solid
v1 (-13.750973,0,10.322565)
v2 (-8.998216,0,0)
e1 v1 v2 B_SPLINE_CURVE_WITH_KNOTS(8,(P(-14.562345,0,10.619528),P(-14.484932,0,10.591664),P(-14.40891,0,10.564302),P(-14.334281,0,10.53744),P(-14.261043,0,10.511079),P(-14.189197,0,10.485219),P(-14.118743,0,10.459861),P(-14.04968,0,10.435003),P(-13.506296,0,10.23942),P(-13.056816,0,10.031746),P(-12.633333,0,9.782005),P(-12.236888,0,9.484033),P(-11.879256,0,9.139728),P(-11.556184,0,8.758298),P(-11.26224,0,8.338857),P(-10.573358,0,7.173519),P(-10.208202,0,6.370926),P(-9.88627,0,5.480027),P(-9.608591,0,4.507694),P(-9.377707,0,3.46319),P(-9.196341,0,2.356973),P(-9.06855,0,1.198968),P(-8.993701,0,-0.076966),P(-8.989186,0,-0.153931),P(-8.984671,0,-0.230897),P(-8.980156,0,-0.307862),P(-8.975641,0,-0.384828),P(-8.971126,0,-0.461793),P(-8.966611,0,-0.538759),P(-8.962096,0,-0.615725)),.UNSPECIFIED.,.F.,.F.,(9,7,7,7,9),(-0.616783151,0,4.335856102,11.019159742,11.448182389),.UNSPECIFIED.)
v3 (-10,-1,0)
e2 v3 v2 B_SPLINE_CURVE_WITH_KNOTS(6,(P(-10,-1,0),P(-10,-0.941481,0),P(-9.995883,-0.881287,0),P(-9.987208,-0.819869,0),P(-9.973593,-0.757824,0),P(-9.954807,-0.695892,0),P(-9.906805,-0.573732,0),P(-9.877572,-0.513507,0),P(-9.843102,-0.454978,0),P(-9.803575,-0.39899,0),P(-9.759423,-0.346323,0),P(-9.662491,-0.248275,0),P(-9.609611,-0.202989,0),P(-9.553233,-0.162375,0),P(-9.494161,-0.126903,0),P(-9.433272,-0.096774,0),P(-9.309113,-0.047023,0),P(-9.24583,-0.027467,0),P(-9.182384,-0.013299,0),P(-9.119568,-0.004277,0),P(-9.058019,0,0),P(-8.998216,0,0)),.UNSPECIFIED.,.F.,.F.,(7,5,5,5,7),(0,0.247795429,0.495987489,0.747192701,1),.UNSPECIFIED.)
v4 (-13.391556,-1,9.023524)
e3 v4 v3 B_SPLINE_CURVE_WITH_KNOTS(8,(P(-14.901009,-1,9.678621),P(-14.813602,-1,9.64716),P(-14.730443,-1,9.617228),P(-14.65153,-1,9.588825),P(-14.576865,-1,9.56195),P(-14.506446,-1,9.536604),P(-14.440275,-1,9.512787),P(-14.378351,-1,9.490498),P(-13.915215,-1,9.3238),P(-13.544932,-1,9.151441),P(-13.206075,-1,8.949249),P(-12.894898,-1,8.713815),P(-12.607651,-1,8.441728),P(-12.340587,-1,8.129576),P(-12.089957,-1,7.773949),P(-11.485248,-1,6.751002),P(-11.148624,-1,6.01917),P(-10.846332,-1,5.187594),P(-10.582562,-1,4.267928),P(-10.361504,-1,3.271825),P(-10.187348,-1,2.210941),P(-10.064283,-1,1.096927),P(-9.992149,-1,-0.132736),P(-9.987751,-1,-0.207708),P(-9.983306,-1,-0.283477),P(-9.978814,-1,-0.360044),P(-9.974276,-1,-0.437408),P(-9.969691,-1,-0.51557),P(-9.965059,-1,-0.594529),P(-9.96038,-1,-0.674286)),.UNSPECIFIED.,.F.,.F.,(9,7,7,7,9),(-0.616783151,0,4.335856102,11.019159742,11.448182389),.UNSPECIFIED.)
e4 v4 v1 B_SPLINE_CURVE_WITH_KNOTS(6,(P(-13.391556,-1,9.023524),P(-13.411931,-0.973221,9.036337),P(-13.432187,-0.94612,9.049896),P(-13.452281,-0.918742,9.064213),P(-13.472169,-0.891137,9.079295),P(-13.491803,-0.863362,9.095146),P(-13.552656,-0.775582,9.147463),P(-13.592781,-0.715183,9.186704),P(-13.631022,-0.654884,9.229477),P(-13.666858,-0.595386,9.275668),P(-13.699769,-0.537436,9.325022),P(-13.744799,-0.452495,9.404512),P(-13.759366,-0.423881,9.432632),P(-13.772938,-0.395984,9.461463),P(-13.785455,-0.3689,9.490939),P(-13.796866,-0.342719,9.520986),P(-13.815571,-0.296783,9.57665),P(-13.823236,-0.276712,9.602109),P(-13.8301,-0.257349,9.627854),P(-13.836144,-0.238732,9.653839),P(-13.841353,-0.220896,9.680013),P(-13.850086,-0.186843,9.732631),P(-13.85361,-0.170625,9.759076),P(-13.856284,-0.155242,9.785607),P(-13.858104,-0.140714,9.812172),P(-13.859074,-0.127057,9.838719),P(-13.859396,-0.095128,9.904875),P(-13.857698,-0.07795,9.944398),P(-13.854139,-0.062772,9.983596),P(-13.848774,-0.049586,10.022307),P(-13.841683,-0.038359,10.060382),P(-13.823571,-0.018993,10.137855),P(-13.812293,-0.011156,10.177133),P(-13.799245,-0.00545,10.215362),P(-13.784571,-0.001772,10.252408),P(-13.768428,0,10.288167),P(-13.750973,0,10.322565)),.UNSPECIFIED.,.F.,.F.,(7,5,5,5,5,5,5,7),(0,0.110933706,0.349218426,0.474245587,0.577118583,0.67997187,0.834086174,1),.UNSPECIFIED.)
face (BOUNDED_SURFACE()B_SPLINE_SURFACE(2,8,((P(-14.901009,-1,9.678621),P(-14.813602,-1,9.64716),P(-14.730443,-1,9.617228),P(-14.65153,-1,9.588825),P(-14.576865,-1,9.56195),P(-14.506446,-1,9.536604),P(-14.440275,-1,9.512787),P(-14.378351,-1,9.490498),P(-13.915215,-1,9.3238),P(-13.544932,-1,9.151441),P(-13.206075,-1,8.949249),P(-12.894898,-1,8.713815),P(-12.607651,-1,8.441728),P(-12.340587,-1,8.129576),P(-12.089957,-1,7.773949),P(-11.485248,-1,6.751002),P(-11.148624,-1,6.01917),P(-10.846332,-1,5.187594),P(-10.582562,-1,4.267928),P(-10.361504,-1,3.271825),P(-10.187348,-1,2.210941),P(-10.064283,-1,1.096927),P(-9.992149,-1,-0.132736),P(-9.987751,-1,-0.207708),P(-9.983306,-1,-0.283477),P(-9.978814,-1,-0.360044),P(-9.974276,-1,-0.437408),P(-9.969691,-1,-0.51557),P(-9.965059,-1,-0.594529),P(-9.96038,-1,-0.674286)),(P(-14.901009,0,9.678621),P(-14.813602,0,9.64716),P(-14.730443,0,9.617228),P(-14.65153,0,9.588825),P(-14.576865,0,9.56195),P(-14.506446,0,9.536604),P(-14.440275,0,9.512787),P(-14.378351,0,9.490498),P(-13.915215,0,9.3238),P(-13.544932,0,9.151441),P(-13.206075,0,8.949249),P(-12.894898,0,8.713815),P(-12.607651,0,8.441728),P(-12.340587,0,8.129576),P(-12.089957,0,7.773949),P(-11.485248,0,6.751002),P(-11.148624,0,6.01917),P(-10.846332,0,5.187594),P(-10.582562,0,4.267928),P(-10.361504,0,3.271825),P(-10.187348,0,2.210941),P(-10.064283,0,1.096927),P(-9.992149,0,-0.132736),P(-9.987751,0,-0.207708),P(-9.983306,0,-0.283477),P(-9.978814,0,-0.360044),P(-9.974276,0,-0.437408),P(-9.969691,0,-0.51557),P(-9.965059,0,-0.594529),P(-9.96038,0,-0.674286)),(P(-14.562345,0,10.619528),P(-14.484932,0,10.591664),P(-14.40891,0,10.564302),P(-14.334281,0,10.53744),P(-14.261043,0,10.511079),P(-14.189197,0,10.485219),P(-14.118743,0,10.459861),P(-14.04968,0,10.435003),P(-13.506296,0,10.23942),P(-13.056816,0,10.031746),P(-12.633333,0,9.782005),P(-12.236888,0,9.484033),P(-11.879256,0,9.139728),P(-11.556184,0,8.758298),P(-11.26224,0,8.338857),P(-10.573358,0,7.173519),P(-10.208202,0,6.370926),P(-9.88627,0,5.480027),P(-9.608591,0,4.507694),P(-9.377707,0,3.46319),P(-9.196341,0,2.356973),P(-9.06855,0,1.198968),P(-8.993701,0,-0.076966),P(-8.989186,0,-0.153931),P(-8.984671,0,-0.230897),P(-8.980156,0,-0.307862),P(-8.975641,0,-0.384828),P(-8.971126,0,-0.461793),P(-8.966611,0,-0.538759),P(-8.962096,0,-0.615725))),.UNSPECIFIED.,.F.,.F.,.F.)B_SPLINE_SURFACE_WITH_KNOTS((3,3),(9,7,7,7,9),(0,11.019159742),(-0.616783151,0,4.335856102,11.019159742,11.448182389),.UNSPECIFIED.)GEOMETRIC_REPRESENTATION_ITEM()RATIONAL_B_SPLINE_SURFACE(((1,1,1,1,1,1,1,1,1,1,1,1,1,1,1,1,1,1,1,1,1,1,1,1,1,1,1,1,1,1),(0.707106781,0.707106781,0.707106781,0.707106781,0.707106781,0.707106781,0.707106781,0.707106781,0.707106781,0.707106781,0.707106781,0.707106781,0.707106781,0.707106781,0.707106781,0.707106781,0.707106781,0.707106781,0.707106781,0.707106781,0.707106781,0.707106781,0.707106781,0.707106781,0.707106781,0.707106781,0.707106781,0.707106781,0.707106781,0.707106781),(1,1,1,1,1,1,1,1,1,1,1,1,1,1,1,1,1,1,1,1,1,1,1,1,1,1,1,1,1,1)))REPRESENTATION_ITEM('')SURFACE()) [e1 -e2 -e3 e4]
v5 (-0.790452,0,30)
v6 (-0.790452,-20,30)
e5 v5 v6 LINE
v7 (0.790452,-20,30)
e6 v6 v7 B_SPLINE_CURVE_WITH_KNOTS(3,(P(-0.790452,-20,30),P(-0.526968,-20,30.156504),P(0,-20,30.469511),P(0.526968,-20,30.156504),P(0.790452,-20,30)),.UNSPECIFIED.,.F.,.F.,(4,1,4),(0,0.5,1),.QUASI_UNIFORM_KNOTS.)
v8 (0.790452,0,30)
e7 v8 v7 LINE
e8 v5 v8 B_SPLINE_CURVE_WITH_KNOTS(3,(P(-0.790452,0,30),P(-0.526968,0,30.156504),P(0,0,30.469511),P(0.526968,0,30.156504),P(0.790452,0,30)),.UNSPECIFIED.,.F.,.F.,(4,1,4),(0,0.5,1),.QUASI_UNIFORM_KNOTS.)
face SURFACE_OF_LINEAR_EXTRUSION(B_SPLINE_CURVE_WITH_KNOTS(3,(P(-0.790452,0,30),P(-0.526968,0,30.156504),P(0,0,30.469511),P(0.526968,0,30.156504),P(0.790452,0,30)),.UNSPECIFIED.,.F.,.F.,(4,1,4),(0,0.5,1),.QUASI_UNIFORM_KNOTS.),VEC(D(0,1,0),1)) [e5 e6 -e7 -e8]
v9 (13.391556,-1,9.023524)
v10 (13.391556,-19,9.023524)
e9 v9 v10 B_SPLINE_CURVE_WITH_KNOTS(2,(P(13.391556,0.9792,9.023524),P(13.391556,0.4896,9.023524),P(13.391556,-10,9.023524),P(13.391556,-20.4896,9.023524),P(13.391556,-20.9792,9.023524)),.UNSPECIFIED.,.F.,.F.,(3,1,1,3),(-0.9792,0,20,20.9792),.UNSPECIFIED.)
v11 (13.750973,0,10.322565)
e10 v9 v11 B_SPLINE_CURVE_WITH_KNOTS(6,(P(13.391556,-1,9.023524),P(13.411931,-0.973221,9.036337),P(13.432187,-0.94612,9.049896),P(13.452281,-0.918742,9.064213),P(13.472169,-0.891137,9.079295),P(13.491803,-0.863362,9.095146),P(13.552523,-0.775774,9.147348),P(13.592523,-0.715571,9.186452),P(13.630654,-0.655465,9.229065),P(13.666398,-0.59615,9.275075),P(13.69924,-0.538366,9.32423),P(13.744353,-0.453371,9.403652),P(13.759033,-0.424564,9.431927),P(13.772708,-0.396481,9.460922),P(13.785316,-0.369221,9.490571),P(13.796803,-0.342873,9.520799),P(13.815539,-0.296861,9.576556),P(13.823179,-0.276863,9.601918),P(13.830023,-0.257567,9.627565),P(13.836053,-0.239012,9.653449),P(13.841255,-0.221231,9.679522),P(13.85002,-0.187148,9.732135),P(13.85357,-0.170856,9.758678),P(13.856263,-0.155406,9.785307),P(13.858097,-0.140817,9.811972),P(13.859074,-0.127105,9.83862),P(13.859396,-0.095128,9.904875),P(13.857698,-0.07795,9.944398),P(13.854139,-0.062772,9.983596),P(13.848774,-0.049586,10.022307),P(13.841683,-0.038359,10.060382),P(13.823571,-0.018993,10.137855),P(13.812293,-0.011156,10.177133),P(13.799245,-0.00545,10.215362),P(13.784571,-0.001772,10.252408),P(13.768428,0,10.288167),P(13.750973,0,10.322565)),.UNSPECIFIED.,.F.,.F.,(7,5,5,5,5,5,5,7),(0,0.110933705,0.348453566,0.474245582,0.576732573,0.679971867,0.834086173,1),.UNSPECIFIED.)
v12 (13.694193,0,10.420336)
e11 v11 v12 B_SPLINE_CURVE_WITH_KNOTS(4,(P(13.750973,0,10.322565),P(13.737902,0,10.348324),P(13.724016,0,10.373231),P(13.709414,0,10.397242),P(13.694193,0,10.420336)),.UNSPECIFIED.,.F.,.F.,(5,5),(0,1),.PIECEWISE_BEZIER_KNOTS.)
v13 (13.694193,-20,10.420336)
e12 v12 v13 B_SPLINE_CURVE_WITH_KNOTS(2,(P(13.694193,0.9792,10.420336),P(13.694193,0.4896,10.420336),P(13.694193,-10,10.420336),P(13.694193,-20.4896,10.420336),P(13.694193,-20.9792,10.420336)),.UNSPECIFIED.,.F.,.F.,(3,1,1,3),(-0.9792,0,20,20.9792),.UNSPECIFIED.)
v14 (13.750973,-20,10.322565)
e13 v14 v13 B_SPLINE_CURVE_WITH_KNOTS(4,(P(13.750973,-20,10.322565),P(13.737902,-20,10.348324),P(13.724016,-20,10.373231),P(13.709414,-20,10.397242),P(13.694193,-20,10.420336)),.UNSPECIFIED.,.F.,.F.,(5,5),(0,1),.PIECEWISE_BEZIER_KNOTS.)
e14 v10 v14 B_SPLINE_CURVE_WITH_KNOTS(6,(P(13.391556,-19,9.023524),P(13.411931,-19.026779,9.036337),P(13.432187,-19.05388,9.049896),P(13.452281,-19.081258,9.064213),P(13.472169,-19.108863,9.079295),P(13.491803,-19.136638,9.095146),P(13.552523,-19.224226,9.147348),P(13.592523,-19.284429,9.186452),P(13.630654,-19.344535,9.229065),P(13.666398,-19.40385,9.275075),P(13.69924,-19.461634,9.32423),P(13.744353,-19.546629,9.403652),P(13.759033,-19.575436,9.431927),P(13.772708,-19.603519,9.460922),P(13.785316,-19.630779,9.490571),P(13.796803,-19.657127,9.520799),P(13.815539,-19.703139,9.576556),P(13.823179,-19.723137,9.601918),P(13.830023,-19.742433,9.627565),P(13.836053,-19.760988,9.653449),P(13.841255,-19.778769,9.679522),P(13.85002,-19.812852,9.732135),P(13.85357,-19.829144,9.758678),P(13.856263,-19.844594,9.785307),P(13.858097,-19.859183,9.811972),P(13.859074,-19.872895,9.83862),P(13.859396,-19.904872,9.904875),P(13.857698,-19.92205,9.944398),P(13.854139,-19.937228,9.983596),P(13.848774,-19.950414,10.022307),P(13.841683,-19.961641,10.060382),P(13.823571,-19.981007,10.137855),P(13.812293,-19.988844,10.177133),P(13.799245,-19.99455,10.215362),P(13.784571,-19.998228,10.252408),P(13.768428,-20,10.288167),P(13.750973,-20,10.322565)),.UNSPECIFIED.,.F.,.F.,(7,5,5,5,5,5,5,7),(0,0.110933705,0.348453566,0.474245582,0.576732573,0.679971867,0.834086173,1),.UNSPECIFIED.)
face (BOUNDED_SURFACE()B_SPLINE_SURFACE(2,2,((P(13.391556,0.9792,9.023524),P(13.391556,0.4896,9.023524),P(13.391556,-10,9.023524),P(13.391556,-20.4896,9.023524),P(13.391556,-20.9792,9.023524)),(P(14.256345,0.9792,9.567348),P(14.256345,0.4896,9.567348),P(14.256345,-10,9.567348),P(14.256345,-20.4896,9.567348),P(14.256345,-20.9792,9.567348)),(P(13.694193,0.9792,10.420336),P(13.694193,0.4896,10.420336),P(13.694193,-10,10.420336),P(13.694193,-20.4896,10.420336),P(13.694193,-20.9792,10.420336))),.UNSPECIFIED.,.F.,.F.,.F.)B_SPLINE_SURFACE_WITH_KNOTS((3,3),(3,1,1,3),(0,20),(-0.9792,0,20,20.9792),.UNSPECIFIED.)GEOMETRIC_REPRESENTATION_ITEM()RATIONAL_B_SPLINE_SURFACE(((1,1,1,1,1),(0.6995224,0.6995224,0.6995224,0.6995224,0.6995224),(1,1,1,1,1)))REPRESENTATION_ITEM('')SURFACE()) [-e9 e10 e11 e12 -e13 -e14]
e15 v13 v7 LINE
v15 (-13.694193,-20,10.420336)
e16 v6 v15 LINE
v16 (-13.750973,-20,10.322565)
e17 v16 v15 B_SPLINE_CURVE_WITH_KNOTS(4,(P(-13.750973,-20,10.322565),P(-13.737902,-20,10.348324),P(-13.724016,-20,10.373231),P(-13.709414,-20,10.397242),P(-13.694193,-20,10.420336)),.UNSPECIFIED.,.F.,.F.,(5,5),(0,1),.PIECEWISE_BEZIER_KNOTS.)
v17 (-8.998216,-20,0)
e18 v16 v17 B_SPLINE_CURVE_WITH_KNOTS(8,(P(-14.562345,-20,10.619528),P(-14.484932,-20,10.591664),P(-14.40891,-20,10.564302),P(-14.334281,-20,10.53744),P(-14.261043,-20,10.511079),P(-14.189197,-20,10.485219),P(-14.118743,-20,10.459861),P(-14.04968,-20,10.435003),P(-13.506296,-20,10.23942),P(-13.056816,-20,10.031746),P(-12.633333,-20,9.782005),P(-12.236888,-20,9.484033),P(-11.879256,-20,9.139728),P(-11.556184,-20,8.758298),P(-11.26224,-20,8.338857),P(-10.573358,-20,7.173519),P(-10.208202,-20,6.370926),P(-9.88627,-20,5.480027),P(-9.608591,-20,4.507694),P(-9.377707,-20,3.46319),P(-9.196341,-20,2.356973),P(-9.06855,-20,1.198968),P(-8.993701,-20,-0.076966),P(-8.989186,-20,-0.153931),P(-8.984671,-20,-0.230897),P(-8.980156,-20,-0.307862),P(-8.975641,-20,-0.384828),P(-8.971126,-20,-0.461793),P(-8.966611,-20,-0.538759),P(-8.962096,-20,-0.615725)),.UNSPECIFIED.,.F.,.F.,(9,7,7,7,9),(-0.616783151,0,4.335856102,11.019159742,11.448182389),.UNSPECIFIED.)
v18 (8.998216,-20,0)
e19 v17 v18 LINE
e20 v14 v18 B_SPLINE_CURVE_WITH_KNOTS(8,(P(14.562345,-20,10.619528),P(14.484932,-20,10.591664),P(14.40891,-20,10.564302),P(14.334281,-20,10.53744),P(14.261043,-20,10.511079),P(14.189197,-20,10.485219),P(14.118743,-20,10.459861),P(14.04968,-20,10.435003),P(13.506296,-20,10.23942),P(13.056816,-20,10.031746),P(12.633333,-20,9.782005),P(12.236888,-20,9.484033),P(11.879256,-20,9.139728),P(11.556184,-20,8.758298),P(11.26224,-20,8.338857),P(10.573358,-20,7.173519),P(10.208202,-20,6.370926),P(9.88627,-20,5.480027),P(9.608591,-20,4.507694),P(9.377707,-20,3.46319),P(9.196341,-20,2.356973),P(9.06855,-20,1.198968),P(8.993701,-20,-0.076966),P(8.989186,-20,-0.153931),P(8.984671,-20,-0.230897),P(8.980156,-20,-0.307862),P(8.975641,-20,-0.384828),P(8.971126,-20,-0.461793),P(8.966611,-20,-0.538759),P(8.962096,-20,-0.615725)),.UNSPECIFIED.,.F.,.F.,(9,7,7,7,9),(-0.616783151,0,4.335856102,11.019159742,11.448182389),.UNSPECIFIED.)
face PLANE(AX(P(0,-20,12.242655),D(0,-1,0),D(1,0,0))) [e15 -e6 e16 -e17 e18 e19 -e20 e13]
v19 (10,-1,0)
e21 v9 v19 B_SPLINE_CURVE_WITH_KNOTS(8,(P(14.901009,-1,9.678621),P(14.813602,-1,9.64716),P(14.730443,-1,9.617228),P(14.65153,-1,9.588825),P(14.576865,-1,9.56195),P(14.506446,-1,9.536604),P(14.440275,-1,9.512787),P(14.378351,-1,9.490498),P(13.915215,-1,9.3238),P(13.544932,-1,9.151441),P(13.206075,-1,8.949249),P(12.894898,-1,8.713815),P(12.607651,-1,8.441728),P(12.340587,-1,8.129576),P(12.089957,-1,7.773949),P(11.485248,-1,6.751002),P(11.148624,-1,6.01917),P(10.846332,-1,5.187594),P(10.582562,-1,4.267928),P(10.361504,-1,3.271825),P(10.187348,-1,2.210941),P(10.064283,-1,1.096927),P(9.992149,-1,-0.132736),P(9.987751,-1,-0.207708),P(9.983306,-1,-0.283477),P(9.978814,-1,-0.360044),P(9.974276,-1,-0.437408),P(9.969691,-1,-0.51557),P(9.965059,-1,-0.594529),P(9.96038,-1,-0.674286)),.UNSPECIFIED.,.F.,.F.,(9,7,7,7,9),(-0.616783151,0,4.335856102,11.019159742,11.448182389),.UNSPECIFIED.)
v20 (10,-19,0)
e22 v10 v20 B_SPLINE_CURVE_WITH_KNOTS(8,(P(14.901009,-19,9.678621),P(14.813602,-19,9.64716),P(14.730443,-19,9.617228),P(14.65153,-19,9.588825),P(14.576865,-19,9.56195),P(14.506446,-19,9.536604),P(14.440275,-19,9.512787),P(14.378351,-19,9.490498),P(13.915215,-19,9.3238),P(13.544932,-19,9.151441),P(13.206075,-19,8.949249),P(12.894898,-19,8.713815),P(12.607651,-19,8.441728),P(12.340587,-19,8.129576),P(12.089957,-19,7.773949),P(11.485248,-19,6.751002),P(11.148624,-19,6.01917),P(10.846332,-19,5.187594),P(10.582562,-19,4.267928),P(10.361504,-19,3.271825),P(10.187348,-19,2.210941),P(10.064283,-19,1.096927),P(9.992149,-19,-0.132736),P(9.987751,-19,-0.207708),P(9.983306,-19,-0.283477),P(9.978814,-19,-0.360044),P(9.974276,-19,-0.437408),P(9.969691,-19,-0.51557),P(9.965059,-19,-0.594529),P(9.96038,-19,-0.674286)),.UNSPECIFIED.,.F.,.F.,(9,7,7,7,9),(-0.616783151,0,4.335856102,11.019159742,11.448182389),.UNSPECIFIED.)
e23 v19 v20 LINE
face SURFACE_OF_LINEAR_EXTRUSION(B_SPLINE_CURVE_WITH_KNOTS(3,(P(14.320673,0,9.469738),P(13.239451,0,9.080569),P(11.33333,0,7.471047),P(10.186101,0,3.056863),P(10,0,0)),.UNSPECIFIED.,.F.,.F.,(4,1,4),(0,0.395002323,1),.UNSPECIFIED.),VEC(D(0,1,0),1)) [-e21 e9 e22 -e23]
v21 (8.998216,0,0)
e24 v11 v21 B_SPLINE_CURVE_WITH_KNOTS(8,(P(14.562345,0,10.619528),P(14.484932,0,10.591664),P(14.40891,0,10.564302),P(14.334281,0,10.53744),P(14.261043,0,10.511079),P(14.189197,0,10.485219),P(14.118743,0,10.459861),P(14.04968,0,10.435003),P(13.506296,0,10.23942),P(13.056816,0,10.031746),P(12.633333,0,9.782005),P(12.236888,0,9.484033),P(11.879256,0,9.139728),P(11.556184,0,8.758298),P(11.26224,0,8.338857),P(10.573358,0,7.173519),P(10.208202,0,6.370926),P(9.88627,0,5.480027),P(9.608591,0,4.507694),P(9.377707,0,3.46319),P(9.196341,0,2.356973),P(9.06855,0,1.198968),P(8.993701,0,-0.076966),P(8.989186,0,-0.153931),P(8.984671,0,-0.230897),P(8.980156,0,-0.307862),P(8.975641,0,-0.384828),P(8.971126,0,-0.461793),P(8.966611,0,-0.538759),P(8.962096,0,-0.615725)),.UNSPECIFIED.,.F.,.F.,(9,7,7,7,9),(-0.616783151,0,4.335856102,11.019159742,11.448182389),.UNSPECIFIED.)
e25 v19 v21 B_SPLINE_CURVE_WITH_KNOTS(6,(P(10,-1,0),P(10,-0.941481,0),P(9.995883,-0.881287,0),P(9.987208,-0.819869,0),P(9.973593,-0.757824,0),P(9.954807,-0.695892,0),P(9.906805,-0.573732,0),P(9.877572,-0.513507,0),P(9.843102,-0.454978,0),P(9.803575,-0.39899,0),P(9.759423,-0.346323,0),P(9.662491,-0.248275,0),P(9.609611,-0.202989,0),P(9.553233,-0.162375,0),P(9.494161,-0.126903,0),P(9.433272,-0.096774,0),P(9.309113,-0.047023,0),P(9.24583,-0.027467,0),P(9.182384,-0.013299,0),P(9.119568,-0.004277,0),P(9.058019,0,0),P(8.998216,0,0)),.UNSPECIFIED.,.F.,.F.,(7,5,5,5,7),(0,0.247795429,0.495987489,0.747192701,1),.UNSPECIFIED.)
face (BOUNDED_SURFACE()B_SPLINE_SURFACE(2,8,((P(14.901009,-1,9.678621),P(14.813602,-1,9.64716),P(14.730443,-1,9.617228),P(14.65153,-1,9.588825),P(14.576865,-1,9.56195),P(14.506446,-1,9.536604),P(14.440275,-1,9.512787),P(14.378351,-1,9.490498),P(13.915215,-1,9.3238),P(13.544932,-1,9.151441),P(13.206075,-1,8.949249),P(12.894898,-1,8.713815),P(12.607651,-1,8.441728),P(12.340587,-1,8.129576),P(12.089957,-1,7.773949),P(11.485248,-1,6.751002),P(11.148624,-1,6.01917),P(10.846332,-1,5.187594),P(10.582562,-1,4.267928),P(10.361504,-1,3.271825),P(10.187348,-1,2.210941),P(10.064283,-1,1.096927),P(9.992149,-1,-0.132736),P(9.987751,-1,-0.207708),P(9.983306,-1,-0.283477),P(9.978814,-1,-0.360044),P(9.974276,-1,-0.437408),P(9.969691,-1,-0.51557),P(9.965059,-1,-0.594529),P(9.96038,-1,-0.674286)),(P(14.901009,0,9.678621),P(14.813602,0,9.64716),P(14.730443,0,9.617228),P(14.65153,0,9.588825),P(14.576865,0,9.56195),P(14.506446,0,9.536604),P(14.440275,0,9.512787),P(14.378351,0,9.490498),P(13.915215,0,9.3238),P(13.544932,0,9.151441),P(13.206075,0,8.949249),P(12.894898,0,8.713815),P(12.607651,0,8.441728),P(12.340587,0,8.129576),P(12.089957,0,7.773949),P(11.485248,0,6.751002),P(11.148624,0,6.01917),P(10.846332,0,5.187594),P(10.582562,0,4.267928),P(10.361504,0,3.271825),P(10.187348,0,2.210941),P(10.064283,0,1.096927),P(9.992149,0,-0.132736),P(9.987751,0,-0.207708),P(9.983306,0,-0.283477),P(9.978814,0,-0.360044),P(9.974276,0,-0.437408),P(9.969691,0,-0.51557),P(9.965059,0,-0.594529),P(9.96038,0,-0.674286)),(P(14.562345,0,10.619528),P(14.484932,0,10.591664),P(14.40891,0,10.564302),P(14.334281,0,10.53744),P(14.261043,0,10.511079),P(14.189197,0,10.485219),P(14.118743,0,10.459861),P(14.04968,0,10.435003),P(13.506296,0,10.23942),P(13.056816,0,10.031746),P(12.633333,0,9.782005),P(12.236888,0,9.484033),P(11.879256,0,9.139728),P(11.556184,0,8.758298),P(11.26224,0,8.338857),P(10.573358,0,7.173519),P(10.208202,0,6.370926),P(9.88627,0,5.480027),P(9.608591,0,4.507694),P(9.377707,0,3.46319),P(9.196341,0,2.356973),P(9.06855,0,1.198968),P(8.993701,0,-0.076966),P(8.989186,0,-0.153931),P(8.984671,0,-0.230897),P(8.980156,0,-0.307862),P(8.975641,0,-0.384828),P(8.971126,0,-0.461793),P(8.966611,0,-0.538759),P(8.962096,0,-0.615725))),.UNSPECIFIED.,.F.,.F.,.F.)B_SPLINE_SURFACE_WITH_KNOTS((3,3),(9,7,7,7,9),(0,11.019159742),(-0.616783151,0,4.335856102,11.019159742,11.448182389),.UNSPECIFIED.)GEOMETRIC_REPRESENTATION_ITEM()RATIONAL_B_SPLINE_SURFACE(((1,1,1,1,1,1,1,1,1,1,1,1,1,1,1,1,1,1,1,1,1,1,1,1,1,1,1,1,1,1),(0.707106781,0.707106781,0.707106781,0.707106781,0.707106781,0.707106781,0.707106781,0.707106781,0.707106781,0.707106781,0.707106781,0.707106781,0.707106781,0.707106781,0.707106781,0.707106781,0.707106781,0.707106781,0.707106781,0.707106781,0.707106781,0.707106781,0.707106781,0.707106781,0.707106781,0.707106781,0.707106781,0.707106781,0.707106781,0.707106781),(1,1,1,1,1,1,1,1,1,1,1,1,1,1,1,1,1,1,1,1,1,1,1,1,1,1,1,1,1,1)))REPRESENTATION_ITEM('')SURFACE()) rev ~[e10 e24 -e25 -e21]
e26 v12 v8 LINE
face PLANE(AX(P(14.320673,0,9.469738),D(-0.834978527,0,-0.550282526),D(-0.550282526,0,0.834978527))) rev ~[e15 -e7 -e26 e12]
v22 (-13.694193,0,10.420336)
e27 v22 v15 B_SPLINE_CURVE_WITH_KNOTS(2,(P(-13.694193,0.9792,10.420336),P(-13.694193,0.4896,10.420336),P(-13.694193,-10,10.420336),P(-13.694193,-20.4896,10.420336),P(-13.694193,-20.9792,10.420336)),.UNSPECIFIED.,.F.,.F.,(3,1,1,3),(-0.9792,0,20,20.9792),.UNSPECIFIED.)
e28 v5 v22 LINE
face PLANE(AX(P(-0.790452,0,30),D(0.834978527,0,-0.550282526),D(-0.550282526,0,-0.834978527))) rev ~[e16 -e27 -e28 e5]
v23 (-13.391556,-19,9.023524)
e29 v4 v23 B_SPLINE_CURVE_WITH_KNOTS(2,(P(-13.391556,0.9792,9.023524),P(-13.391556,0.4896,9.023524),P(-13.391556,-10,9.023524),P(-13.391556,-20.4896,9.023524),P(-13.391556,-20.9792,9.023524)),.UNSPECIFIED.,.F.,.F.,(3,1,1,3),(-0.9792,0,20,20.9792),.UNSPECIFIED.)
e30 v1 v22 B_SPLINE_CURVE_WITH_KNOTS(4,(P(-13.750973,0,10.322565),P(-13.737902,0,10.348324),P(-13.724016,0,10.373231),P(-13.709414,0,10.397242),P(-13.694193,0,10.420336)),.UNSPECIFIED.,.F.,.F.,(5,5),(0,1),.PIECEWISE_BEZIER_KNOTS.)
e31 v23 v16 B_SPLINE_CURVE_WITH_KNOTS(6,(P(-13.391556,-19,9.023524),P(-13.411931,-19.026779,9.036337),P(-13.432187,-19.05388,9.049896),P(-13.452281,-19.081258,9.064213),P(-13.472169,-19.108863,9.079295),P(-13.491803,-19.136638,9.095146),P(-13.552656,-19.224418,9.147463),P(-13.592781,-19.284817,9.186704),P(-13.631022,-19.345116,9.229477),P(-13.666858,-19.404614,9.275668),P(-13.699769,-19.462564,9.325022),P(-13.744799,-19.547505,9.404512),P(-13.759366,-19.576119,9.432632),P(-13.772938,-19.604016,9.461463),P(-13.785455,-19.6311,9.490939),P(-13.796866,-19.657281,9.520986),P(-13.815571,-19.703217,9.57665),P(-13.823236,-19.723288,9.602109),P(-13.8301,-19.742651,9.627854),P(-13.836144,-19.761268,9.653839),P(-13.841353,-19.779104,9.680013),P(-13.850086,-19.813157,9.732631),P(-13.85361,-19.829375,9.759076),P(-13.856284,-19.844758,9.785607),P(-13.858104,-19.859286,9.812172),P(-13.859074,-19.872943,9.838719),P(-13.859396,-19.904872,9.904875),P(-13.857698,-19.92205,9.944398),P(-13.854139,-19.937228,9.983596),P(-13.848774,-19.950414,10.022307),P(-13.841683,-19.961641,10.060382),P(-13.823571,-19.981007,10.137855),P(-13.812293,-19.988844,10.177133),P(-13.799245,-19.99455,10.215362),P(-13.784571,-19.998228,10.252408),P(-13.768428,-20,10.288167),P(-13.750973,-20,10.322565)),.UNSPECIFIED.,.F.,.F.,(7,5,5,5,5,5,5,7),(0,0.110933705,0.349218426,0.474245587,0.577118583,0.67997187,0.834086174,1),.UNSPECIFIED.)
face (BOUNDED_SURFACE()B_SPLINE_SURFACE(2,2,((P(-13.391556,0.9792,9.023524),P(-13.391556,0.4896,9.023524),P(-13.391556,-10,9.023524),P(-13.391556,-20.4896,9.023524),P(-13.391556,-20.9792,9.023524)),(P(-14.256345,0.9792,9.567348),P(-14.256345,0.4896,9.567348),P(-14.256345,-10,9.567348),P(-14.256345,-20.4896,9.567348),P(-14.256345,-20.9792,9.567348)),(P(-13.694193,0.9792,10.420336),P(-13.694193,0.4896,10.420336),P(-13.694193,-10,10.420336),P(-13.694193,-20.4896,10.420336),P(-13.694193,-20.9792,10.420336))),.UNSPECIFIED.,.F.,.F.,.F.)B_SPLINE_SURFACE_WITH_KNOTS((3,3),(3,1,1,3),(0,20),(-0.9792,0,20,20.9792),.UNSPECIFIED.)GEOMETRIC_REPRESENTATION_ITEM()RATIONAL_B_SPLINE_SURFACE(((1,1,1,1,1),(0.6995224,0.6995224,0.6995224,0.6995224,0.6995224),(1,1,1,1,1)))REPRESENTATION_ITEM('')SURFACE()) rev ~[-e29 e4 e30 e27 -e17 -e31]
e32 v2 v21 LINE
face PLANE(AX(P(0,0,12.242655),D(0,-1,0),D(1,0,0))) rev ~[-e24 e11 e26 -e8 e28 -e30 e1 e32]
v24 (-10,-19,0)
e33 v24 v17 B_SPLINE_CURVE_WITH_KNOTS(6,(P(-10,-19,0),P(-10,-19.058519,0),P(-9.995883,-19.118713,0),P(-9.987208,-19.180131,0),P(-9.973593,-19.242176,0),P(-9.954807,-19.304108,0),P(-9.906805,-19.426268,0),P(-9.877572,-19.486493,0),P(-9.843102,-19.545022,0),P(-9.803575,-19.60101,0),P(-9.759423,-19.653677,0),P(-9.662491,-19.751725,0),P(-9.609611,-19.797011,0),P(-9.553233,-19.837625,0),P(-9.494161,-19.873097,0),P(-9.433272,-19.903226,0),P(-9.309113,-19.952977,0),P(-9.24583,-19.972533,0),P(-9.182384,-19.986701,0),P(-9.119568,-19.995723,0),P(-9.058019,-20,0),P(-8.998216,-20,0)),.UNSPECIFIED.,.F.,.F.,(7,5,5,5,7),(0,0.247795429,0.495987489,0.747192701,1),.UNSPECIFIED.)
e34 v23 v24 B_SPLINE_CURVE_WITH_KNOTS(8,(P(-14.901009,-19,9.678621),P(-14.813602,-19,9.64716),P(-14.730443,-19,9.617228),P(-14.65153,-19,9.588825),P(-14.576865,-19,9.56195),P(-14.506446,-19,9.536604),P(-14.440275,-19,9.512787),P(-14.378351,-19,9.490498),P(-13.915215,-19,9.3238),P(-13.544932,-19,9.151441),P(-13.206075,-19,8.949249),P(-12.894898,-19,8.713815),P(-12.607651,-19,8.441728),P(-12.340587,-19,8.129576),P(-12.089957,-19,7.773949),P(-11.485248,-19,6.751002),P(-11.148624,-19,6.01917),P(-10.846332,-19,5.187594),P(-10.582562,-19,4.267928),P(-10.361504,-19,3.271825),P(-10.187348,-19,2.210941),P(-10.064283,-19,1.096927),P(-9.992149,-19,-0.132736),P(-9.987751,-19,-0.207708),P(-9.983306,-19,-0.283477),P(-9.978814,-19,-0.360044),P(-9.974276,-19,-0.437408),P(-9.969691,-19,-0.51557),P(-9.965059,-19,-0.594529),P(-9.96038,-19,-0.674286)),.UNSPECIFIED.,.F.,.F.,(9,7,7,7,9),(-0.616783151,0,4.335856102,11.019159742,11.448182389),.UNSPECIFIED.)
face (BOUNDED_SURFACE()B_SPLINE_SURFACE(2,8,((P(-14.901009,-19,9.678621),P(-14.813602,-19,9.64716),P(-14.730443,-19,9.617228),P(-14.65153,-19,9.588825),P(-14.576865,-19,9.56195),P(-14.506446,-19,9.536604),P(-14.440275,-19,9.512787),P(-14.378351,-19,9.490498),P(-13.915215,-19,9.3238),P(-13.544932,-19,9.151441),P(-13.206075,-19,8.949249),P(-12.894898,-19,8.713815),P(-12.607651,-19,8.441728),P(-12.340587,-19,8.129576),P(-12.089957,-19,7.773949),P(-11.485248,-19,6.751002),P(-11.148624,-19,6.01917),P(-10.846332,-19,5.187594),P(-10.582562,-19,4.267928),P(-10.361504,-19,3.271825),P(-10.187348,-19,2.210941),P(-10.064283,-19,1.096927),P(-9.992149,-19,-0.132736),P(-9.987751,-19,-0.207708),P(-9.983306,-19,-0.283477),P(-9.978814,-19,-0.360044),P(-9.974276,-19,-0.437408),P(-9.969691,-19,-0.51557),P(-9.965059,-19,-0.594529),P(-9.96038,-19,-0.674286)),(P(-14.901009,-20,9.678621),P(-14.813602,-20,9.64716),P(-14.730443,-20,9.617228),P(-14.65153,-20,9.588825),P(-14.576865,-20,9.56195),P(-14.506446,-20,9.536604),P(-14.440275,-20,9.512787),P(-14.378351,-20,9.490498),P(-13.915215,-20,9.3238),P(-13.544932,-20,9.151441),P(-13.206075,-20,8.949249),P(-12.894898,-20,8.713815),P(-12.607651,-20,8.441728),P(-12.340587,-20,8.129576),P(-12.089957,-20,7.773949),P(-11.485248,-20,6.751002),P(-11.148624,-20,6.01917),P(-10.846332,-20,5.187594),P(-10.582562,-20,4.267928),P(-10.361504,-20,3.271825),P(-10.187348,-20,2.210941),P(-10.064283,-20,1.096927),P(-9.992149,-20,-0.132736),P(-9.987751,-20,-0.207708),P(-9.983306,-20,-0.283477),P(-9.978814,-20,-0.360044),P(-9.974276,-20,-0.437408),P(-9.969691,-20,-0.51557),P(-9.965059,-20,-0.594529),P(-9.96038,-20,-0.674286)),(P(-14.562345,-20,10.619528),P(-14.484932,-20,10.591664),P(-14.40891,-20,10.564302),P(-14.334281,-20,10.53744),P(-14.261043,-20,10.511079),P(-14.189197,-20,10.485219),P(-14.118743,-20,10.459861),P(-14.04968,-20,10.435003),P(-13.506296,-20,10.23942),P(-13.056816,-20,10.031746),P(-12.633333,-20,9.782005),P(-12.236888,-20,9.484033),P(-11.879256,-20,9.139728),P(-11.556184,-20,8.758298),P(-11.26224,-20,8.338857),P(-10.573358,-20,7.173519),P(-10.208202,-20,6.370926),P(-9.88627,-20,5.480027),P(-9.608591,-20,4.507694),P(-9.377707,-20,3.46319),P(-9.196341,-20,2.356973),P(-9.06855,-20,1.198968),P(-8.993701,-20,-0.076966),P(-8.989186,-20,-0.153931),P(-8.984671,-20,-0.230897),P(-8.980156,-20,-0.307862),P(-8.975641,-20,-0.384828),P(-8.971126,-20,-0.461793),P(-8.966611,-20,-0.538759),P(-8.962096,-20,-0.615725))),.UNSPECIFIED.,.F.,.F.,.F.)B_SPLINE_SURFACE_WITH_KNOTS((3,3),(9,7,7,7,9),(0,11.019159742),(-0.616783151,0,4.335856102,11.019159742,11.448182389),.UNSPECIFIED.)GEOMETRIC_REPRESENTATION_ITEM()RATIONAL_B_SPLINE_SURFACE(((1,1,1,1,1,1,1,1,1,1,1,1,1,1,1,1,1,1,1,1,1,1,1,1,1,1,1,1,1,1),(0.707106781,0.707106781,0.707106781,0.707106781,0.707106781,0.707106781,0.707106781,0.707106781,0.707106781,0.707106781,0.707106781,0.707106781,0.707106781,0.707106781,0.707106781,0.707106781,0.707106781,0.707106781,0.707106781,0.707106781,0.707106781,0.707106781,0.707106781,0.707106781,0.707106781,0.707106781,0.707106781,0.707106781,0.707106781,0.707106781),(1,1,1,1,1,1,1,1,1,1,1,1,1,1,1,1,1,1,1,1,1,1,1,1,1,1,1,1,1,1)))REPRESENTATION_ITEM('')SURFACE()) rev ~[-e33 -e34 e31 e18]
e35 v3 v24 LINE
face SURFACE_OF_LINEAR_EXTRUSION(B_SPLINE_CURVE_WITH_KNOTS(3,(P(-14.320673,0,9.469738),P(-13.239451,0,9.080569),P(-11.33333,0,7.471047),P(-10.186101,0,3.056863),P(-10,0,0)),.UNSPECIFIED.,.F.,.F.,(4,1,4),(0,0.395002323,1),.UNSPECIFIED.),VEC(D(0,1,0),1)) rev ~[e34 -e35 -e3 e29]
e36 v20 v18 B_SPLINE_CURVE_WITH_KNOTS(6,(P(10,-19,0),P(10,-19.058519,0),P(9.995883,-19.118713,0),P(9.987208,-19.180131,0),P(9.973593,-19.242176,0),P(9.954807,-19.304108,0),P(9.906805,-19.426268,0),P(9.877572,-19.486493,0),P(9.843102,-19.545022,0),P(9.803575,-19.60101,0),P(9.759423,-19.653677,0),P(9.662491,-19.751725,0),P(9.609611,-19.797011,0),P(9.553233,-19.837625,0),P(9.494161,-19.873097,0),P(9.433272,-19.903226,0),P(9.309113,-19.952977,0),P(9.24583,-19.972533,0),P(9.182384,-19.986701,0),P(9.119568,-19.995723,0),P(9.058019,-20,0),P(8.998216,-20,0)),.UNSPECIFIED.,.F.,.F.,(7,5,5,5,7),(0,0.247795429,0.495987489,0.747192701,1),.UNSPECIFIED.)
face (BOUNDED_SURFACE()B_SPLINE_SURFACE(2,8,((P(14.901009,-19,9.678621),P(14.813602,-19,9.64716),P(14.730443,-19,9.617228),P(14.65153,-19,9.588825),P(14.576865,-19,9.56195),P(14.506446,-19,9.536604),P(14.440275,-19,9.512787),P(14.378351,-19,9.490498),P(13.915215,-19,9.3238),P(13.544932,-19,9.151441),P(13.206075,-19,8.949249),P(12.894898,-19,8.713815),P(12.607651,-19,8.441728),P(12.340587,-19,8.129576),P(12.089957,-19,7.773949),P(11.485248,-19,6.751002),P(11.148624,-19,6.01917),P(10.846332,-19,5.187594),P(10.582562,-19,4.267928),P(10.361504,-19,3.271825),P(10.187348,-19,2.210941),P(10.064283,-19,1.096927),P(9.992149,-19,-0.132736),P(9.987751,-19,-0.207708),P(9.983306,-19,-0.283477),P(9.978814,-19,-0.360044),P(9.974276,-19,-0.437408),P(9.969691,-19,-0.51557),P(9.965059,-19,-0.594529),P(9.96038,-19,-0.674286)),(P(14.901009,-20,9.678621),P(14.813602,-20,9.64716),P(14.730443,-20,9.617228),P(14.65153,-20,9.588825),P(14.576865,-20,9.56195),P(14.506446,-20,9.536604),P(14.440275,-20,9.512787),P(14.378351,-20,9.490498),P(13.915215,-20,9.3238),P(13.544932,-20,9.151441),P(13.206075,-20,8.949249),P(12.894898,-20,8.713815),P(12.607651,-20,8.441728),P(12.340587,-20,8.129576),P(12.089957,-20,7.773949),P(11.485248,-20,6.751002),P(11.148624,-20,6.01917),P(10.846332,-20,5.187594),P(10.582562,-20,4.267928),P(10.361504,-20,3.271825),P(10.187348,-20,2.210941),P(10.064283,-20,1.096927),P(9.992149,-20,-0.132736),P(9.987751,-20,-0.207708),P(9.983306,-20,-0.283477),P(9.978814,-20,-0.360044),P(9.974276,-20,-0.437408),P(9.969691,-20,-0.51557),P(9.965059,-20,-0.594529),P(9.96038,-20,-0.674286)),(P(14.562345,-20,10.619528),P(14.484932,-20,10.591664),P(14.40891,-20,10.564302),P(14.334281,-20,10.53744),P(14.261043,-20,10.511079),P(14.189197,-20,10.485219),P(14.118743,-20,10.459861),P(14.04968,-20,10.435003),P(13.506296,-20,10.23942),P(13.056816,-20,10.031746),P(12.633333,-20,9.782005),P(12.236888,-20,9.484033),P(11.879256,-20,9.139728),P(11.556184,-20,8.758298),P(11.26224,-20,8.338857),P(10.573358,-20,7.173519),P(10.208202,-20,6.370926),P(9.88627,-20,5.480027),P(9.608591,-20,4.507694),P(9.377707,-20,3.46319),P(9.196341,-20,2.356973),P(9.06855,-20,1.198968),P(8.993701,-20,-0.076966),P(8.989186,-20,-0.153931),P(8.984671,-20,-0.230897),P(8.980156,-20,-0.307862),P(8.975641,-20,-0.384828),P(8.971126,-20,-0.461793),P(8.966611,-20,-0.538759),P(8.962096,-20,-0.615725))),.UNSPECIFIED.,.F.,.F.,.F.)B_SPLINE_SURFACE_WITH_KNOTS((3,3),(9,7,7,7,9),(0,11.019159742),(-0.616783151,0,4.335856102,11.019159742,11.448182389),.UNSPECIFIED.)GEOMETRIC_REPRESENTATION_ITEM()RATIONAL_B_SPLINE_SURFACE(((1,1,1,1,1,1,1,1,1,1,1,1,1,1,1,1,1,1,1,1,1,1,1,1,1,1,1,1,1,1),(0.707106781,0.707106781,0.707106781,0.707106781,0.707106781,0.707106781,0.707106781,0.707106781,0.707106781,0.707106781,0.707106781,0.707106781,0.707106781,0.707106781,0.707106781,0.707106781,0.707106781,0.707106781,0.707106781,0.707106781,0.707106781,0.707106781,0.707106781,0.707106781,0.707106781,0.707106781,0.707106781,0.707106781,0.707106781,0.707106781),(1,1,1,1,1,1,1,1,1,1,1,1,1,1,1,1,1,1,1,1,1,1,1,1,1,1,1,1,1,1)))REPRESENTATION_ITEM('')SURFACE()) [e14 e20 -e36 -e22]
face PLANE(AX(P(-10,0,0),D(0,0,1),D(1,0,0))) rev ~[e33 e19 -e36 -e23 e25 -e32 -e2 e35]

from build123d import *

# Parameters (mm, degrees)
F1_DEPTH = 20
F2_R     = 1


# Not quite as in the source:
# - a feature names something its author has since deleted; it is built from what else it names


with BuildPart() as f1:
    # F0 (on Front) → F1 (new body)
    with BuildSketch(Plane.XZ):
        with BuildLine():
            add(Edge.make_bspline(
                [(-14.320673421, 9.4697382301), (-13.2394510975, 9.0805694331), (-11.3333298848, 7.4710466695), (-10.1861008598, 3.0568630532), (-10, 0)],
                knots=[0, 0, 0, 0, 0.3950023229, 1, 1, 1, 1], degree=3))
            Line((-10, 0), (0, 0))
            Line((0, 0), (10, 0))
            add(Edge.make_bspline(
                [(14.320673421, 9.4697382301), (13.2394510975, 9.0805694331), (11.3333298848, 7.4710466695), (10.1861008598, 3.0568630532), (10, 0)],
                knots=[0, 0, 0, 0, 0.3950023229, 1, 1, 1, 1], degree=3))
            Line((14.320673421, 9.4697382301), (0.7904520571, 30))
            add(Edge.make_bspline(
                [(-0.7904520571, 30), (-0.5269680381, 30.1565037668), (0, 30.4695113003), (0.5269680381, 30.1565037668), (0.7904520571, 30)],
                knots=[0, 0, 0, 0, 0.5, 1, 1, 1, 1], degree=3))
            Line((-0.7904520571, 30), (-14.320673421, 9.4697382301))
        make_face()
    extrude(amount=F1_DEPTH)

    # F2
    f2_edges = [f1.edges().sort_by_distance(p)[0] for p in [
        (-14.320673, -10, 9.469738),
        (14.320673, -10, 9.469738),
        (-10.973556, 0, 5.385962),
        (-10.973556, -20, 5.385962),
        (10.973556, 0, 5.385962),
        (10.973556, -20, 5.385962),
    ]]
    fillet(f2_edges, radius=F2_R)


solid = f1.part
